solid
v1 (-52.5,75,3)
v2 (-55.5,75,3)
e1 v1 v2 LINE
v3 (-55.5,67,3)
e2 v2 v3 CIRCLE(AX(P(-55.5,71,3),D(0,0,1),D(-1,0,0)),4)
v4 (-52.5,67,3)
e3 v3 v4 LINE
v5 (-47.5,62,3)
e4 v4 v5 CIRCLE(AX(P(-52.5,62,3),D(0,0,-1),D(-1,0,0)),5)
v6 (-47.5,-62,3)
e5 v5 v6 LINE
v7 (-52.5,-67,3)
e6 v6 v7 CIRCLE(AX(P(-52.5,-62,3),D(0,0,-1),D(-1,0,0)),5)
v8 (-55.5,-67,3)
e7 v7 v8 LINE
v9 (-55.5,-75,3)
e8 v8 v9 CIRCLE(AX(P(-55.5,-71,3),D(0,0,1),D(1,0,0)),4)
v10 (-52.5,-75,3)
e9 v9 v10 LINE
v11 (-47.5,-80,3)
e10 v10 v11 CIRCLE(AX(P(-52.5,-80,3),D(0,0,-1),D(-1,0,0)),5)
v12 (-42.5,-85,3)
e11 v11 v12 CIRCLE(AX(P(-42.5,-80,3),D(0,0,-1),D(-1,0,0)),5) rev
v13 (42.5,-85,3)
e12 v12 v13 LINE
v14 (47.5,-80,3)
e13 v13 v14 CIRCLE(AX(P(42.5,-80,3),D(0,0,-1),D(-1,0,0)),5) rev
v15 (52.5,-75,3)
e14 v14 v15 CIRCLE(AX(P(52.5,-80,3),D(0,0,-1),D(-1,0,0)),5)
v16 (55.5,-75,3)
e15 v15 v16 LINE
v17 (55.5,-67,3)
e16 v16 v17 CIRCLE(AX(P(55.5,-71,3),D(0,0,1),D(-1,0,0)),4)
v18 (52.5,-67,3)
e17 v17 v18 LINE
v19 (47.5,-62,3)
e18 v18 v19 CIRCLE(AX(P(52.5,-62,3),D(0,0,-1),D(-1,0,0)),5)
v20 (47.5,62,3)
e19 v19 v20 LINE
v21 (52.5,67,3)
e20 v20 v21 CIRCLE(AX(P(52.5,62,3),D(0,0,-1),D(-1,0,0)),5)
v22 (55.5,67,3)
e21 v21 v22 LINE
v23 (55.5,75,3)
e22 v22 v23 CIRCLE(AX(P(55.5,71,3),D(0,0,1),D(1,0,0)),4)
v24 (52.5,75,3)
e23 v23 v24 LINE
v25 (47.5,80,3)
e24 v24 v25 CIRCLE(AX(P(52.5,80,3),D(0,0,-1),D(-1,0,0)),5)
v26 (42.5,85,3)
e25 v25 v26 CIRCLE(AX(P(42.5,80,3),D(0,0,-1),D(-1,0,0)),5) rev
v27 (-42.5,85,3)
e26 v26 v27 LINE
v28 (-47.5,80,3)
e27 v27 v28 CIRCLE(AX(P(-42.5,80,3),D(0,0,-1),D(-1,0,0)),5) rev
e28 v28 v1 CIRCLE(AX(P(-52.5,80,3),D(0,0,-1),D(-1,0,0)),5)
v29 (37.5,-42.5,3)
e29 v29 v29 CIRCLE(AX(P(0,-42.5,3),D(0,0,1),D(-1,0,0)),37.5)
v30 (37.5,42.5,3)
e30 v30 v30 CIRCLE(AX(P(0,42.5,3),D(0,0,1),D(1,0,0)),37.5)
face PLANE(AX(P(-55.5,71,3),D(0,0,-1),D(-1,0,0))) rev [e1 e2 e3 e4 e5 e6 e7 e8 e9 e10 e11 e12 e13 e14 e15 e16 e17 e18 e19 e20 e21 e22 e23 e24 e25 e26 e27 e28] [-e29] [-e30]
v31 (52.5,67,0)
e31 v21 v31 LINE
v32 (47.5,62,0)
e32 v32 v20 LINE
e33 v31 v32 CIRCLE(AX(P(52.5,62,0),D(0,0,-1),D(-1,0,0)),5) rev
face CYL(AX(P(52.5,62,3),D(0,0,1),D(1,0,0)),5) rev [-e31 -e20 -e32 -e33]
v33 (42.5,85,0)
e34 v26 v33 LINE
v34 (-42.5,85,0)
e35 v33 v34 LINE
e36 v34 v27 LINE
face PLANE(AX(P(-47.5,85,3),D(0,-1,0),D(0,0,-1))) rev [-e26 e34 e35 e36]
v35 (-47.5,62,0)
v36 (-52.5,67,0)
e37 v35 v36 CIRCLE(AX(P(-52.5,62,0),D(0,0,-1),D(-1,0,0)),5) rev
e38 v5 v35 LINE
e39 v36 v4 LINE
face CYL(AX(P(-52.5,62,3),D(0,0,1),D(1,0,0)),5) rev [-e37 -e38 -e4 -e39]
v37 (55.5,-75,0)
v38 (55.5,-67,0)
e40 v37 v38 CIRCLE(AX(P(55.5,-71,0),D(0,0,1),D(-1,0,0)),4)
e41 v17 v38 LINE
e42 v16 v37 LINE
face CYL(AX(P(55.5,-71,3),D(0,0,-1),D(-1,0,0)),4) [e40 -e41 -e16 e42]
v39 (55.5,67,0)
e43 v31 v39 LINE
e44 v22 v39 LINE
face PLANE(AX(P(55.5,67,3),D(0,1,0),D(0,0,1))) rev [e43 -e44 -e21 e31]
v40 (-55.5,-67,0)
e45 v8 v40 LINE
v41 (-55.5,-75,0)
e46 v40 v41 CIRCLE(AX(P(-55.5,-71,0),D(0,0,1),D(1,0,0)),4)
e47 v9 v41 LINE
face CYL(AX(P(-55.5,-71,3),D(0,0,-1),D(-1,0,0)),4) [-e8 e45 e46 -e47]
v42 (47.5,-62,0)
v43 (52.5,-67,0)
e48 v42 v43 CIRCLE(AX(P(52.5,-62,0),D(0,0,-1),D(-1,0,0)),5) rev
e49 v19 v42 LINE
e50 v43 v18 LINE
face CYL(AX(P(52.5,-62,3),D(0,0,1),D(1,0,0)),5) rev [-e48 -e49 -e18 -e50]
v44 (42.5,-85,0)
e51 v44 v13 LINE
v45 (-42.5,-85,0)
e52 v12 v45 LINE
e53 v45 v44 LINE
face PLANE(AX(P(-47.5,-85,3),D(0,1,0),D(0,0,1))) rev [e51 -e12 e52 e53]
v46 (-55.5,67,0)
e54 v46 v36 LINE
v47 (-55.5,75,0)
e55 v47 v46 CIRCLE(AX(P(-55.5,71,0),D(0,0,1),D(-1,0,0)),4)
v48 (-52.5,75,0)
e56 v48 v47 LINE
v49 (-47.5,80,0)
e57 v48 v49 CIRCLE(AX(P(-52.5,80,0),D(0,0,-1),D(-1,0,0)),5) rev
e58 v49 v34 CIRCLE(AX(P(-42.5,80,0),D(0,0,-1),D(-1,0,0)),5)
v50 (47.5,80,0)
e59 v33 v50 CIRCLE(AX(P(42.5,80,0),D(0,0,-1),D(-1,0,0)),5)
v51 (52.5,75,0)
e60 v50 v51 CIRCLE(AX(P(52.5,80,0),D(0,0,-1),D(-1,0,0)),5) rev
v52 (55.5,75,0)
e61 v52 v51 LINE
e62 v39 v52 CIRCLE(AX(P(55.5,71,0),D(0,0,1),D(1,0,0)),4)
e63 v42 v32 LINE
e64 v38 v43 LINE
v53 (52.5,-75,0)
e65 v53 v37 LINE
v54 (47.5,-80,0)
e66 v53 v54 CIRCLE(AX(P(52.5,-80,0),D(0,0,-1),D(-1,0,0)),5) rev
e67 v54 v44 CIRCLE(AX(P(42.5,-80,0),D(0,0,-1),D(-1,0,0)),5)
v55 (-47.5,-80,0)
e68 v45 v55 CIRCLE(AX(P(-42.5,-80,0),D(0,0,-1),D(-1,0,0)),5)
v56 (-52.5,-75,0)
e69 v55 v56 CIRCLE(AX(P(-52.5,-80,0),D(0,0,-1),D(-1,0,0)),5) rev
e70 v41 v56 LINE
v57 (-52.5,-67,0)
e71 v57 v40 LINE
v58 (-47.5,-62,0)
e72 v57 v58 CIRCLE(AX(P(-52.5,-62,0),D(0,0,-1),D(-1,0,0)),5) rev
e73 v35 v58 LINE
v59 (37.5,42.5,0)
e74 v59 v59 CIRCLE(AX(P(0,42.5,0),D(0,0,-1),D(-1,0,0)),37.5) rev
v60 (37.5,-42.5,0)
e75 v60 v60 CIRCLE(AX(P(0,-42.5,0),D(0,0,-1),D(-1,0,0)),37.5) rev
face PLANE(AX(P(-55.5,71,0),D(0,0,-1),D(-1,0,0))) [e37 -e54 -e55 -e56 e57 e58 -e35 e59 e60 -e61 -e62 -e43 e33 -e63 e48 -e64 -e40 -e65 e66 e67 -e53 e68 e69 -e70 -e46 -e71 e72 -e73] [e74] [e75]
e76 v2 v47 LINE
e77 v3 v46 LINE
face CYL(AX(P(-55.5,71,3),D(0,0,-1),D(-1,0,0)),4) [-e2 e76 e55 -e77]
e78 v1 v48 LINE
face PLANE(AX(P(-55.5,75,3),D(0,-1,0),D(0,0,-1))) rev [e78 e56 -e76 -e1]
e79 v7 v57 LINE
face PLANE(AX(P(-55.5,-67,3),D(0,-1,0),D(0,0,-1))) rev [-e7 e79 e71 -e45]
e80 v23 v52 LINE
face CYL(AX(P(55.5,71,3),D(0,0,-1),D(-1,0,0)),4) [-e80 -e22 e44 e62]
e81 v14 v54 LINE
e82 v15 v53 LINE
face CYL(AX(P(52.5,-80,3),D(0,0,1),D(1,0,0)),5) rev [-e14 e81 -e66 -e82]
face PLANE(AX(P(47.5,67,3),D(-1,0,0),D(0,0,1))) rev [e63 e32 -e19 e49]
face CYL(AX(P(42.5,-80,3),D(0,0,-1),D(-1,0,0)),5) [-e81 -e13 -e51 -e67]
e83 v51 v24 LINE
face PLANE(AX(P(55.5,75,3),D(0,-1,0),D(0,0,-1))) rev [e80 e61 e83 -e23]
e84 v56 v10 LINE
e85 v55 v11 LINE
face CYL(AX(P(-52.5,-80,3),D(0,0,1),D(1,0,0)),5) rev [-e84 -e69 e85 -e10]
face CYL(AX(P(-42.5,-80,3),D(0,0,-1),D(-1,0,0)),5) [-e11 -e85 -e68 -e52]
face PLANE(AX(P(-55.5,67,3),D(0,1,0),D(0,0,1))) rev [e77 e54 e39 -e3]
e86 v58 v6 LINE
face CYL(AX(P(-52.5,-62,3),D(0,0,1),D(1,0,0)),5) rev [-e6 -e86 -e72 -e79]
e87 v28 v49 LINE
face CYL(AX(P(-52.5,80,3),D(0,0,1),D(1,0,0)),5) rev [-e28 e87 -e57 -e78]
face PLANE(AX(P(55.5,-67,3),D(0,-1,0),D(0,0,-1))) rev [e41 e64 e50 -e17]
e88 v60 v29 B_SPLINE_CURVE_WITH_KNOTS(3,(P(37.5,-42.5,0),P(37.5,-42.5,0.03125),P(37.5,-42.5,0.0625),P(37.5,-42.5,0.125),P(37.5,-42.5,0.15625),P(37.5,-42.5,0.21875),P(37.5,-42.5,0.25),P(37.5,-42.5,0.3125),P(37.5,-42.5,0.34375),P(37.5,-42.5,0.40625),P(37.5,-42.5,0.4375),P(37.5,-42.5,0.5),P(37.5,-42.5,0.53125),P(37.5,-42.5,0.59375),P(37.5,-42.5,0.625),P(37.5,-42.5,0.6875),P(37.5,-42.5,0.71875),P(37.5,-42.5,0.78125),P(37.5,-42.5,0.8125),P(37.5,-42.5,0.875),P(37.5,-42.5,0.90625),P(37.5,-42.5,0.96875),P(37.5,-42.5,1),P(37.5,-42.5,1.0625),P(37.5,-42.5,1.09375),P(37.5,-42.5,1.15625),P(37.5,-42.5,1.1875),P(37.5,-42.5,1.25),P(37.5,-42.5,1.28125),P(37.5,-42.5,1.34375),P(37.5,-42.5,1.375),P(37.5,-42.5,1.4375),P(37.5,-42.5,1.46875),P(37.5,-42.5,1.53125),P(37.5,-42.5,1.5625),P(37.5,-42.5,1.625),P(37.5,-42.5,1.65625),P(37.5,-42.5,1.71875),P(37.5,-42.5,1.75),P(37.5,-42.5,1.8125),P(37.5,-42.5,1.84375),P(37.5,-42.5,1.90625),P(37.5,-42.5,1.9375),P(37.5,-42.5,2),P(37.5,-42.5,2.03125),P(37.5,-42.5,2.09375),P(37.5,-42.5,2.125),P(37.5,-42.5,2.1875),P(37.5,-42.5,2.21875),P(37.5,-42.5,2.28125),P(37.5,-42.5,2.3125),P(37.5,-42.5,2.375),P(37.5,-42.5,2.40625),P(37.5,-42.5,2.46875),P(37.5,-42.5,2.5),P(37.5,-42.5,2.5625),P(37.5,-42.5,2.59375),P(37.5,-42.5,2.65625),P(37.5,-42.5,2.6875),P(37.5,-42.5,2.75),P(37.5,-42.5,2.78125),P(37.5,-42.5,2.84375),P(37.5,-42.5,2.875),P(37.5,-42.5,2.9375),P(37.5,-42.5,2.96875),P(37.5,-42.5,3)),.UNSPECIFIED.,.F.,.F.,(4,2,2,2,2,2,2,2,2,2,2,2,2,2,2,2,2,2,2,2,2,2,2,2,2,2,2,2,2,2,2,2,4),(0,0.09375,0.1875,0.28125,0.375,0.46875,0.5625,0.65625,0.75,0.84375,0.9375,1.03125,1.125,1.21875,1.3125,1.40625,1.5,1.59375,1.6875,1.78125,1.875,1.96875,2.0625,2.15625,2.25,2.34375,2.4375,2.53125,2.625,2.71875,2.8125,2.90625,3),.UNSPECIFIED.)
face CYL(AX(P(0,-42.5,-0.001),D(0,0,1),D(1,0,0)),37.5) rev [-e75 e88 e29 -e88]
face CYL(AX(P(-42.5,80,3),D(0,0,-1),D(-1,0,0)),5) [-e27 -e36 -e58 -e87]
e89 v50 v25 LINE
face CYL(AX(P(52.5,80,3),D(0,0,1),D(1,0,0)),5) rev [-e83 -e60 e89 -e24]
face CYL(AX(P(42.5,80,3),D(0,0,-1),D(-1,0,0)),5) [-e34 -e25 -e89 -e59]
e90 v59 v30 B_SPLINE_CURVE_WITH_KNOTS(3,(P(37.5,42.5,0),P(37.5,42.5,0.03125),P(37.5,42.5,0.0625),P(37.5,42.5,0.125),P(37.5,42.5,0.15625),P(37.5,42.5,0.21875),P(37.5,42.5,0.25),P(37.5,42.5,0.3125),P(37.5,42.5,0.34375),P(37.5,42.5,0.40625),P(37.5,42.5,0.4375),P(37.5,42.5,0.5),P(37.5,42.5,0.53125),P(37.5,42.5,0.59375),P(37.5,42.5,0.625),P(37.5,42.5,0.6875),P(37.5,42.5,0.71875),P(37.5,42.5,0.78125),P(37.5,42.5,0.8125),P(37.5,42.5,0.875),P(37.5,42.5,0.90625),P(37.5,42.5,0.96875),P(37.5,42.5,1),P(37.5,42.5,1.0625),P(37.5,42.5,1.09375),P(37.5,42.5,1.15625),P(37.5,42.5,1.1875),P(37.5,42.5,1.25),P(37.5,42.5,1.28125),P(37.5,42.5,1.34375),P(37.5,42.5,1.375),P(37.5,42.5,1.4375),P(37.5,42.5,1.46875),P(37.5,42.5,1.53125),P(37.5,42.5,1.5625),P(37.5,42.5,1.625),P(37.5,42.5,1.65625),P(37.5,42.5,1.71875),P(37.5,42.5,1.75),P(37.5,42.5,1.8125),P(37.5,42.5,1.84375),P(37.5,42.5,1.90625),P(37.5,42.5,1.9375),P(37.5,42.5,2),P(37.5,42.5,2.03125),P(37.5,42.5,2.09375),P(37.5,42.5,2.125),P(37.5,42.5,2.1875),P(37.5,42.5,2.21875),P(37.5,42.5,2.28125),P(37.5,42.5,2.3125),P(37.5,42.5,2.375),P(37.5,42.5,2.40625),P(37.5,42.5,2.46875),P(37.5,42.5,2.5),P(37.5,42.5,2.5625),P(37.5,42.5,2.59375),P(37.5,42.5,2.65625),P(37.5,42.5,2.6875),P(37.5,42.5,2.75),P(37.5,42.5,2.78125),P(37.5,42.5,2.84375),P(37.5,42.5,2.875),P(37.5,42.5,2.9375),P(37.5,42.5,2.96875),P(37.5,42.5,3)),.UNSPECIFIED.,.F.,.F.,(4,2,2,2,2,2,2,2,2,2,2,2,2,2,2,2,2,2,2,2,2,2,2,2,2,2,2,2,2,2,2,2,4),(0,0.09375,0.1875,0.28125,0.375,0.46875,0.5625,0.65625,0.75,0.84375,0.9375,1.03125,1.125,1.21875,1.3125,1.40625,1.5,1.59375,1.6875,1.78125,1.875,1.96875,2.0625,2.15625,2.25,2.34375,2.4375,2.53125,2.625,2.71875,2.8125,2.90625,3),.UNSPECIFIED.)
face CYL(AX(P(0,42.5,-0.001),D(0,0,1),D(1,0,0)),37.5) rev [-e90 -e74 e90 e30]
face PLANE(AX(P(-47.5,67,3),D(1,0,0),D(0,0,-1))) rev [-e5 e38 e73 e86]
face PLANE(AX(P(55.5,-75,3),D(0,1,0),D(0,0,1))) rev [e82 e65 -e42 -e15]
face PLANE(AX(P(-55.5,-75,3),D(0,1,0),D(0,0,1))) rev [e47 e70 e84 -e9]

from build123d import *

# Parameters (mm, degrees)
EXTRUDE_1_DEPTH     = 3
FILLET_1_R          = 5
CUT_EXTRUDE_1_REACH = 105.799
SKETCH_2_R          = 37.5


with BuildPart() as part:
    # 草圖1 → 填料-伸長1 (new body)
    with BuildSketch(Plane.XY):
        with BuildLine():
            Line((-47.5, 67), (-47.5, -67))
            Line((-47.5, -67), (-55.5, -67))
            ThreePointArc((-55.5, -67), (-59.5, -71), (-55.5, -75))
            Line((-55.5, -75), (-47.5, -75))
            Line((-47.5, -75), (-47.5, -85))
            Line((-47.5, -85), (47.5, -85))
            Line((47.5, -85), (47.5, -75))
            Line((47.5, -75), (55.5, -75))
            ThreePointArc((55.5, -75), (59.5, -71), (55.5, -67))
            Line((55.5, -67), (47.5, -67))
            Line((47.5, -67), (47.5, 67))
            Line((47.5, 67), (55.5, 67))
            ThreePointArc((55.5, 67), (59.5, 71), (55.5, 75))
            Line((55.5, 75), (47.5, 75))
            Line((47.5, 75), (47.5, 85))
            Line((47.5, 85), (-47.5, 85))
            Line((-47.5, 85), (-47.5, 75))
            Line((-47.5, 75), (-55.5, 75))
            ThreePointArc((-55.5, 75), (-59.5, 71), (-55.5, 67))
            Line((-55.5, 67), (-47.5, 67))
        make_face()
    extrude(amount=EXTRUDE_1_DEPTH)

    # 圓角1
    fillet_1_edges = [part.edges().sort_by_distance(p)[0] for p in [
        (-47.5, 85, 1.5),
        (47.5, 85, 1.5),
        (47.5, 75, 1.5),
        (47.5, 67, 1.5),
        (47.5, -67, 1.5),
        (47.5, -75, 1.5),
        (47.5, -85, 1.5),
        (-47.5, -85, 1.5),
        (-47.5, -75, 1.5),
        (-47.5, -67, 1.5),
        (-47.5, 67, 1.5),
        (-47.5, 75, 1.5),
    ]]
    fillet(fillet_1_edges, radius=FILLET_1_R - 0.0001)  # a hair under: the kernel refuses the full size

    # 草圖2 → 除料-伸長1 (cut, up to next)
    with BuildSketch(Plane.XY.offset(3), mode=Mode.PRIVATE) as cut_extrude_1_sk1:
        with Locations((0, 42.5)):
            Circle(SKETCH_2_R)
    cut_extrude_1_tool1 = extrude(cut_extrude_1_sk1.sketch, amount=-CUT_EXTRUDE_1_REACH, mode=Mode.PRIVATE) & part.part
    # 草圖2 → 除料-伸長1 (cut, up to next)
    with BuildSketch(Plane.XY.offset(3), mode=Mode.PRIVATE) as cut_extrude_1_sk2:
        with Locations((0, -42.5)):
            Circle(SKETCH_2_R)
    cut_extrude_1_tool2 = extrude(cut_extrude_1_sk2.sketch, amount=-CUT_EXTRUDE_1_REACH, mode=Mode.PRIVATE) & part.part
    add(cut_extrude_1_tool1.solids().sort_by_distance((0, 42.5, 3))[0], mode=Mode.SUBTRACT)
    add(cut_extrude_1_tool2.solids().sort_by_distance((0, -42.5, 3))[0], mode=Mode.SUBTRACT)


solid = part.part
